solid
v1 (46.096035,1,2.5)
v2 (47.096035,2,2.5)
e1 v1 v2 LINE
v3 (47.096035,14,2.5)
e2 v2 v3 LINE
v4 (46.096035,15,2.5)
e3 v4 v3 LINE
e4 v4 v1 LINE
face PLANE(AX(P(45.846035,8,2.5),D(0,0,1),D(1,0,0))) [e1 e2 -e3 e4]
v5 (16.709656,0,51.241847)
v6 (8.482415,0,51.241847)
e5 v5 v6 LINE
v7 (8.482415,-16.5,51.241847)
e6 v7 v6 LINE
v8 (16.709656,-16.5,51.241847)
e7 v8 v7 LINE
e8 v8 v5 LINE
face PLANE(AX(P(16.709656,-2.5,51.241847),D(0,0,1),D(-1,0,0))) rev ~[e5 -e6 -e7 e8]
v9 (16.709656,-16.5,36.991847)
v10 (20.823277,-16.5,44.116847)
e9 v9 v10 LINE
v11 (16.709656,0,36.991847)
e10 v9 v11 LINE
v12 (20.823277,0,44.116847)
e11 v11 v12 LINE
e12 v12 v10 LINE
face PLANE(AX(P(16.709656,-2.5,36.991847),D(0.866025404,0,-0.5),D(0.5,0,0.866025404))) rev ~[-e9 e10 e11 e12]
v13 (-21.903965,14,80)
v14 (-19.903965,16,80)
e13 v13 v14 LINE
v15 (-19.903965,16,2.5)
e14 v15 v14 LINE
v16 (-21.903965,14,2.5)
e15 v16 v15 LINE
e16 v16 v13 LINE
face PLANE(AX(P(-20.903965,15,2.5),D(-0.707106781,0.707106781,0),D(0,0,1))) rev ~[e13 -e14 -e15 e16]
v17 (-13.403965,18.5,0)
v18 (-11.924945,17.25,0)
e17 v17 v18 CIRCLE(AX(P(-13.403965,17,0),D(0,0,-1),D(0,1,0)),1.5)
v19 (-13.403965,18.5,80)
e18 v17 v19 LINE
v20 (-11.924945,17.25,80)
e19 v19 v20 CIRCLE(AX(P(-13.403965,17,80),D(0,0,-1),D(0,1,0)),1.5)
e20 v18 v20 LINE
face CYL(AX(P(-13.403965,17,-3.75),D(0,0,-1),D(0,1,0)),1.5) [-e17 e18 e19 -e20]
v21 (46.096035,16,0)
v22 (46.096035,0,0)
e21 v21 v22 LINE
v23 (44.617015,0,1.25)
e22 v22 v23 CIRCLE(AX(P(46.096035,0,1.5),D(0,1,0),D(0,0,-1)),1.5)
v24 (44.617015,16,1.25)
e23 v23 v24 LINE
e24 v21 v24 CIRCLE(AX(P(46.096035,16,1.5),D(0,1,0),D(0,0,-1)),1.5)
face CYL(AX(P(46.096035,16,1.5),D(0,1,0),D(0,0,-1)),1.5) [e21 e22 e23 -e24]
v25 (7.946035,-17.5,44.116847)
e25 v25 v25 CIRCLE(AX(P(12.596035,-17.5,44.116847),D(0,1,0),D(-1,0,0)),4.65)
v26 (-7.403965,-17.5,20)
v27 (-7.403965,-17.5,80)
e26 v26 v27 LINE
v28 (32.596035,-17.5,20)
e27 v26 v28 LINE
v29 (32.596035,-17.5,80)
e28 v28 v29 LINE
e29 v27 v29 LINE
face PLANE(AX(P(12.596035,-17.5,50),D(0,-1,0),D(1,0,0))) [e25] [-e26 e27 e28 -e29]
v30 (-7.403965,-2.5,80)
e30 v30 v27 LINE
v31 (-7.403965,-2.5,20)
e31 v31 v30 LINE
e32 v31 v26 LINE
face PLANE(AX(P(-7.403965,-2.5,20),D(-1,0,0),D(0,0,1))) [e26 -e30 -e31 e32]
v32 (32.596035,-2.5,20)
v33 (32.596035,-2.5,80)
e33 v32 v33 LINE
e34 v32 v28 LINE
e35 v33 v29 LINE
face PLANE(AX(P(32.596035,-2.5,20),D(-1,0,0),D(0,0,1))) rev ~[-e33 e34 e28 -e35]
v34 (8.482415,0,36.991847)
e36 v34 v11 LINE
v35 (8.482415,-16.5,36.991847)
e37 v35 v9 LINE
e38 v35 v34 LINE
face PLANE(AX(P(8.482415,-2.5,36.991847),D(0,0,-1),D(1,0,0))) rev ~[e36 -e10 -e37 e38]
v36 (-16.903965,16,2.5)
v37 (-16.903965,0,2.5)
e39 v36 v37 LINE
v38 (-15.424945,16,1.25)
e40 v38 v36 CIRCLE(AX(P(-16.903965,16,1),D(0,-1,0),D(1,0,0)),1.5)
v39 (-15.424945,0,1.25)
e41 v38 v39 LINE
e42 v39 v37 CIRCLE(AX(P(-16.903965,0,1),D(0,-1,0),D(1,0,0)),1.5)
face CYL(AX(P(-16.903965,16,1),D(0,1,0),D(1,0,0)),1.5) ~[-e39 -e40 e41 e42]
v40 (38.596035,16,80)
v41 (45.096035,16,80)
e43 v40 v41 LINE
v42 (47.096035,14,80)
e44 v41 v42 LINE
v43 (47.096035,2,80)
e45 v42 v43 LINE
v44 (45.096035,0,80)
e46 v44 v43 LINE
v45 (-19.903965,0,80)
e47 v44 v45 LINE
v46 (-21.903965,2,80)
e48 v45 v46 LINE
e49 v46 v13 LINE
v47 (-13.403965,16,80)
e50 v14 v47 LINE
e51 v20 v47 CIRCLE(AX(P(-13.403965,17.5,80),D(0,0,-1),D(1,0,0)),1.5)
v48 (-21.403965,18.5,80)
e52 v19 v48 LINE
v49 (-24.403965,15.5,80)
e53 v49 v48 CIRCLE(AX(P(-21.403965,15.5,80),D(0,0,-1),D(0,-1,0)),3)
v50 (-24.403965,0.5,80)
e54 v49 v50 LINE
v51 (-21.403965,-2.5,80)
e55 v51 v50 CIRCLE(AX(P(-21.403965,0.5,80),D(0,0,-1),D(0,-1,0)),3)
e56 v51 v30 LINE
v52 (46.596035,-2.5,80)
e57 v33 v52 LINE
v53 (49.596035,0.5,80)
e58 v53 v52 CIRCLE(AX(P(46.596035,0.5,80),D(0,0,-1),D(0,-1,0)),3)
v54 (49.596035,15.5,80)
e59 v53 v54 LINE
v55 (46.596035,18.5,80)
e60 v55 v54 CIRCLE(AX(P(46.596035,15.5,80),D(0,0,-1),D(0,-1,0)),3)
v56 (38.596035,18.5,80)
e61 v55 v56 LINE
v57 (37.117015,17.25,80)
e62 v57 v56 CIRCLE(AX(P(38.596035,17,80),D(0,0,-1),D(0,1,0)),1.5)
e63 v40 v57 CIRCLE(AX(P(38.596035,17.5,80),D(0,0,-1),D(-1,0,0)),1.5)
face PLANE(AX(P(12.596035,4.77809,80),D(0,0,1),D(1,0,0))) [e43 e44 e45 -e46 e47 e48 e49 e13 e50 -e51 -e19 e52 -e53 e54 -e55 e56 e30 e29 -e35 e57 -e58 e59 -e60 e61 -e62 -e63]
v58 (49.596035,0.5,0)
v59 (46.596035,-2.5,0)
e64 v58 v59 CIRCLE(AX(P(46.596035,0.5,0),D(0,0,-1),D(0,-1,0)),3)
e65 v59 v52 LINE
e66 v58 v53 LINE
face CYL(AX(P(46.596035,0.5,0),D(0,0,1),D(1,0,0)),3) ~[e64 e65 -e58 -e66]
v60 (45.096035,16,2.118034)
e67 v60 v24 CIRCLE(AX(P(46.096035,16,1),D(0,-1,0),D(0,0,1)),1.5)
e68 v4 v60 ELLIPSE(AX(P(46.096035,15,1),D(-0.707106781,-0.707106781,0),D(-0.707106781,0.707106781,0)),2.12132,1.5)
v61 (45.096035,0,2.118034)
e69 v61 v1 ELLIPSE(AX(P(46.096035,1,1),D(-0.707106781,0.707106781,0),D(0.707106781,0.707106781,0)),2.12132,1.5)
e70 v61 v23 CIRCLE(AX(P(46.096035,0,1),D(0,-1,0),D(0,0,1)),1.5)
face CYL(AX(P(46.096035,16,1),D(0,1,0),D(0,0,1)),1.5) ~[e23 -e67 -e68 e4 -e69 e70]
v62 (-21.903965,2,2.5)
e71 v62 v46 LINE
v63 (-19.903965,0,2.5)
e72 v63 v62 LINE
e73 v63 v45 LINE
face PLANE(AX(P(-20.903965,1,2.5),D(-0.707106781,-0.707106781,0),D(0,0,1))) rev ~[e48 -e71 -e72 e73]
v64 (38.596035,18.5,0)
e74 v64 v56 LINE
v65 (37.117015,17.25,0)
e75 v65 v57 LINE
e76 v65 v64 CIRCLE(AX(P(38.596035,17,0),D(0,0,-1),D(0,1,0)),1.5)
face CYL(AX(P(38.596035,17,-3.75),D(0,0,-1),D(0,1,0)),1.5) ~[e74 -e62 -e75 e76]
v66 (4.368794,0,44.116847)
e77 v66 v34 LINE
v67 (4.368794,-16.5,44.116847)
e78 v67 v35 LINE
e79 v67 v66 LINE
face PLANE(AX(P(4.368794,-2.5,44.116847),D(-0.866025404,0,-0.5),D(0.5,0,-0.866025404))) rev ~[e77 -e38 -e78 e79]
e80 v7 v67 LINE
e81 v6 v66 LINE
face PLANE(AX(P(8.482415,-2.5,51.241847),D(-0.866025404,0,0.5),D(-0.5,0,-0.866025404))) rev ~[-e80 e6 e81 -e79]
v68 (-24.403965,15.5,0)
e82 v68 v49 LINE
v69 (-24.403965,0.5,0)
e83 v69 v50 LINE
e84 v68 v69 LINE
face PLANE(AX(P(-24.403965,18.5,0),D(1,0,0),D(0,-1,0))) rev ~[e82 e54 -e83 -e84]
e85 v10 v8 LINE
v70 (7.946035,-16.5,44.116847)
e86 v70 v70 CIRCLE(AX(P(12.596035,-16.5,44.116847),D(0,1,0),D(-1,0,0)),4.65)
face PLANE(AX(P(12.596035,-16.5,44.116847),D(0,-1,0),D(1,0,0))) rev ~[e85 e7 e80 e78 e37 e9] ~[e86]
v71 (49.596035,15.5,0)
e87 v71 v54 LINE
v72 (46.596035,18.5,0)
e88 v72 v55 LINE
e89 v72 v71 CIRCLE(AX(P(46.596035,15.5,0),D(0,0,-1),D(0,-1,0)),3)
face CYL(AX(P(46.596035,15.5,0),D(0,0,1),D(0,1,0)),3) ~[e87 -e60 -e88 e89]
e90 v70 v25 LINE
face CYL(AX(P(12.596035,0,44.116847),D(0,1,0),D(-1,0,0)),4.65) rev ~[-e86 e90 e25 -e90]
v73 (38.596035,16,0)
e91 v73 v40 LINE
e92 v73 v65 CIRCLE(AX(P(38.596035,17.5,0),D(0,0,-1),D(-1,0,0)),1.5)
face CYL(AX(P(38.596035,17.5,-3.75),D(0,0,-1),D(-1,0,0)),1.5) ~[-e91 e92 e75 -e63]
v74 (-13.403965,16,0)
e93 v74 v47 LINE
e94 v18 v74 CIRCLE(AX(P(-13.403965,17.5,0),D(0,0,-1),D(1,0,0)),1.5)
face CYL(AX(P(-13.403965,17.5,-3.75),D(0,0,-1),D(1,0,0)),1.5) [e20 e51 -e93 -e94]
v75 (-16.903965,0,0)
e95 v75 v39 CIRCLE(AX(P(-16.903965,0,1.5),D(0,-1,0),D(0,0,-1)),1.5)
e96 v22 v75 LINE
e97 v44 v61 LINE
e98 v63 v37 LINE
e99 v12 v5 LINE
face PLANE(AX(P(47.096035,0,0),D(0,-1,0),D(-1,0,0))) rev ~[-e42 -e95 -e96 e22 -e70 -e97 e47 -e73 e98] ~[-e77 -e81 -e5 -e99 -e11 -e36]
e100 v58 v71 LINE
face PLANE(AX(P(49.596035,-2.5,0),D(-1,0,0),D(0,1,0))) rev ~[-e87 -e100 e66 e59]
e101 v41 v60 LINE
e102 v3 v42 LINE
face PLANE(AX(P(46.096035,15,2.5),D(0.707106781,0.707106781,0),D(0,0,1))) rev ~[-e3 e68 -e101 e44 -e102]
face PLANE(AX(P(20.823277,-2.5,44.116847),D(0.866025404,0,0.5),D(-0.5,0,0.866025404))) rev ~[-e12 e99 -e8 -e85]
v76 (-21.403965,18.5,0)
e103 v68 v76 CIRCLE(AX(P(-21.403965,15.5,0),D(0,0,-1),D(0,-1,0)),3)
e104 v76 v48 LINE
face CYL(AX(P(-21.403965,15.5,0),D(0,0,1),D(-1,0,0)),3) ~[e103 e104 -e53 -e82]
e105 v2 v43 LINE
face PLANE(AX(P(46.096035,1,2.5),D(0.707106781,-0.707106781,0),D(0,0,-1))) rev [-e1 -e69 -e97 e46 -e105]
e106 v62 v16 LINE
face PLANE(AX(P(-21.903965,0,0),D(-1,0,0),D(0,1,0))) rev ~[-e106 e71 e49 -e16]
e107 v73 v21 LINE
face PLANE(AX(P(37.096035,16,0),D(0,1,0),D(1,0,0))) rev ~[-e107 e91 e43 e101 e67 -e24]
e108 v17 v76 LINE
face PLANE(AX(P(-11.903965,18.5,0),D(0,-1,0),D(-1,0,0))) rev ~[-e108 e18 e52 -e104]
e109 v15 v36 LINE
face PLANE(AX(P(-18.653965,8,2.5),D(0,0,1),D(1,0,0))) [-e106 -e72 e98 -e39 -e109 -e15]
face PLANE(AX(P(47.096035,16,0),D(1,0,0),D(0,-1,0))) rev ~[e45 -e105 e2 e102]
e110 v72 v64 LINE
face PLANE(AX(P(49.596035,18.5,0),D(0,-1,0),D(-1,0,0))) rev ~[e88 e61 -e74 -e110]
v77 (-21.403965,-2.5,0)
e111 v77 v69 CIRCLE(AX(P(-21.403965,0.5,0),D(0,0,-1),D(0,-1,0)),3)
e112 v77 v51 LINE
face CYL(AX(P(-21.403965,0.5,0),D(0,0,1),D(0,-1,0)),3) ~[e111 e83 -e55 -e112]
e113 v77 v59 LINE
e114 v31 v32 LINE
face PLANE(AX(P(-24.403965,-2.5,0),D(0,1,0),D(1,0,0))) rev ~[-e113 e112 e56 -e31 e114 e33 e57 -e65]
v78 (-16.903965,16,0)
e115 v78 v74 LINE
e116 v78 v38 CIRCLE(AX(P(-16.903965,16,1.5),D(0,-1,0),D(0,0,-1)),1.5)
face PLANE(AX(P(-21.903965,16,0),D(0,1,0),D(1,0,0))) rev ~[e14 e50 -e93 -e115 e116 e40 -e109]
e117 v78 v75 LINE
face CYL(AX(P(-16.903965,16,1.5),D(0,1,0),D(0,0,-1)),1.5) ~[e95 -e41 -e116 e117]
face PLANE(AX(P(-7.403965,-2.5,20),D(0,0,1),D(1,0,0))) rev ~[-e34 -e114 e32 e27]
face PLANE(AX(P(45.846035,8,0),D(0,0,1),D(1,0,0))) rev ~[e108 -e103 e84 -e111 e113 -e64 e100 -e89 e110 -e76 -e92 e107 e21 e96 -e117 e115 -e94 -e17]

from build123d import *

# Parameters (mm, degrees)
F1_DEPTH      = 80
F0_W          = 2.5
F0_H          = 16
F0_W_2        = 6.5
F2_DEPTH      = 2.5
F3_SIZE       = 2
F4_R          = 3
F5_T1_DEPTH   = 87.5
F5_T3_DEPTH   = 16
F5_T8_DEPTH   = 16
F7_W          = 40
F7_H          = 60
F8_DEPTH      = 15
F6_R          = 4.65
F9_DEPTH      = 14
F9_DEPTH_BACK = 25
F10_R         = 4.65
F11_DEPTH     = 25


# Not quite as in the source:
# - a fillet or chamfer that OpenCascade refuses, or shapes differently, is made with other operations: its cross-section is extruded or revolved along the edge and cut away or added


with BuildPart() as f1:
    # F0 (on Top) → F1 (new body)
    with BuildSketch(Plane.XY):
        Polygon((-11.9039647728, 18.5), (-24.4039647728, 18.5), (-24.4039647728, -2.5), (49.5960352272, -2.5), (49.5960352272, 18.5), (37.0960352272, 18.5), (37.0960352272, 16), (44.5960352272, 16), (47.0960352272, 16), (47.0960352272, 0), (44.5960352272, 0), (-15.4039647728, 0), (-21.9039647728, 0), (-21.9039647728, 16), (-15.4039647728, 16), (-11.9039647728, 16), align=None)
    extrude(amount=F1_DEPTH)

    # F0 (on Top) → F2 (join)
    with BuildSketch(Plane.XY):
        with Locations((45.8460352272, 8)):
            Rectangle(F0_W, F0_H)
        with Locations((-18.6539647728, 8)):
            Rectangle(F0_W_2, F0_H)
    extrude(amount=F2_DEPTH)

    # F3
    f3_edges = [f1.edges().sort_by_distance(p)[0] for p in [
        (47.096035, 0, 41.25),
        (47.096035, 16, 41.25),
        (-21.903965, 0, 41.25),
        (-21.903965, 16, 41.25),
    ]]
    chamfer(f3_edges, length=F3_SIZE)

    # F4
    f4_edges = [f1.edges().sort_by_distance(p)[0] for p in [
        (-24.403965, 18.5, 40),
        (-24.403965, -2.5, 40),
        (49.596035, -2.5, 40),
        (49.596035, 18.5, 40),
    ]]
    fillet(f4_edges, radius=F4_R)

    # F5: fillet of radius 1.5 on 8 edges, made by hand

    # F5_s2 → F5_t1 (cut)
    with BuildSketch(Plane.XY.offset(-3.75)):
        with BuildLine():
            ThreePointArc((-11.9039647728, 17.5), (-12.343304601, 16.4393398282), (-13.4039647728, 16))
            Line((-13.4039647728, 16), (-11.9039647728, 16))
            Line((-11.9039647728, 16), (-11.9039647728, 17.5))
        make_face()
        with BuildLine():
            ThreePointArc((-13.4039647728, 18.5), (-12.343304601, 18.0606601718), (-11.9039647728, 17))
            Line((-11.9039647728, 17), (-11.9039647728, 18.5))
            Line((-11.9039647728, 18.5), (-13.4039647728, 18.5))
        make_face()
        with BuildLine():
            ThreePointArc((38.5960352272, 18.5), (37.5353750554, 18.0606601718), (37.0960352272, 17))
            Line((37.0960352272, 17), (37.0960352272, 18.5))
            Line((37.0960352272, 18.5), (38.5960352272, 18.5))
        make_face()
        with BuildLine():
            ThreePointArc((37.0960352272, 17.5), (37.5353750554, 16.4393398282), (38.5960352272, 16))
            Line((38.5960352272, 16), (37.0960352272, 16))
            Line((37.0960352272, 16), (37.0960352272, 17.5))
        make_face()
    extrude(amount=F5_T1_DEPTH, mode=Mode.SUBTRACT)

    # F5_s4 → F5_t3 (cut)
    with BuildSketch(Plane.XZ.offset(-16)):
        with BuildLine():
            ThreePointArc((46.0960352272, 0), (45.0353750554, 0.4393398282), (44.5960352272, 1.5))
            Line((44.5960352272, 1.5), (44.5960352272, 0))
            Line((44.5960352272, 0), (46.0960352272, 0))
        make_face()
        with BuildLine():
            ThreePointArc((-15.4039647728, 1), (-15.843304601, 2.0606601718), (-16.9039647728, 2.5))
            Line((-16.9039647728, 2.5), (-15.4039647728, 2.5))
            Line((-15.4039647728, 2.5), (-15.4039647728, 1))
        make_face()
        with BuildLine():
            ThreePointArc((-16.9039647728, 0), (-15.843304601, 0.4393398282), (-15.4039647728, 1.5))
            Line((-15.4039647728, 1.5), (-15.4039647728, 0))
            Line((-15.4039647728, 0), (-16.9039647728, 0))
        make_face()
    extrude(amount=F5_T3_DEPTH, mode=Mode.SUBTRACT)


with BuildPart() as f5_tool6:
    # F5_s7 → F5_t8 (new body)
    with BuildSketch(Plane.XZ.offset(-16)):
        with BuildLine():
            ThreePointArc((46.0960352272, 2.5), (45.0353750554, 2.0606601718), (44.5960352272, 1))
            Line((44.5960352272, 1), (44.5960352272, 2.5))
            Line((44.5960352272, 2.5), (46.0960352272, 2.5))
        make_face()
    extrude(amount=F5_T8_DEPTH)

    split(bisect_by=Plane(origin=(30.5480176136, 30.5480176136, 0), x_dir=(0, 0, 1), z_dir=(-0.7071067812, -0.7071067812, 0)), keep=Keep.TOP)

    split(bisect_by=Plane(origin=(22.5480176136, -22.5480176136, 0), x_dir=(0, 0, 1), z_dir=(-0.7071067812, 0.7071067812, 0)), keep=Keep.TOP)


with BuildPart() as f1_1:
    add(f1.part)

    # F5_t5: cut F5_tool6
    add(f5_tool6.part, mode=Mode.SUBTRACT)

    # F7 (on face) → F8 (join)
    with BuildSketch(Plane.XZ.offset(2.5)):
        with Locations((12.5960352272, 50)):
            Rectangle(F7_W, F7_H)
    extrude(amount=F8_DEPTH)

    # F6 (on face) → F9 (cut, two sides)
    with BuildSketch(Plane.XZ.offset(2.5)) as f9_sk:
        Polygon((20.8232765631, 44.1168472171), (16.7096558952, 51.2418472171), (8.4824145592, 51.2418472171), (4.3687938912, 44.1168472171), (8.4824145592, 36.9918472171), (16.7096558952, 36.9918472171), align=None)
        with Locations((12.5960352272, 44.1168472171)):
            Circle(F6_R, mode=Mode.SUBTRACT)
    extrude(amount=F9_DEPTH, mode=Mode.SUBTRACT)
    extrude(f9_sk.sketch, amount=-F9_DEPTH_BACK, mode=Mode.SUBTRACT)

    # F10 (on face) → F11 (cut)
    with BuildSketch(Plane(origin=(0, 0, 0), x_dir=(-1, 0, 0), z_dir=(0, 1, 0))):
        with Locations((-12.5960352272, 44.1168472171)):
            Circle(F10_R)
    extrude(amount=-F11_DEPTH, mode=Mode.SUBTRACT)


solid = f1_1.part
